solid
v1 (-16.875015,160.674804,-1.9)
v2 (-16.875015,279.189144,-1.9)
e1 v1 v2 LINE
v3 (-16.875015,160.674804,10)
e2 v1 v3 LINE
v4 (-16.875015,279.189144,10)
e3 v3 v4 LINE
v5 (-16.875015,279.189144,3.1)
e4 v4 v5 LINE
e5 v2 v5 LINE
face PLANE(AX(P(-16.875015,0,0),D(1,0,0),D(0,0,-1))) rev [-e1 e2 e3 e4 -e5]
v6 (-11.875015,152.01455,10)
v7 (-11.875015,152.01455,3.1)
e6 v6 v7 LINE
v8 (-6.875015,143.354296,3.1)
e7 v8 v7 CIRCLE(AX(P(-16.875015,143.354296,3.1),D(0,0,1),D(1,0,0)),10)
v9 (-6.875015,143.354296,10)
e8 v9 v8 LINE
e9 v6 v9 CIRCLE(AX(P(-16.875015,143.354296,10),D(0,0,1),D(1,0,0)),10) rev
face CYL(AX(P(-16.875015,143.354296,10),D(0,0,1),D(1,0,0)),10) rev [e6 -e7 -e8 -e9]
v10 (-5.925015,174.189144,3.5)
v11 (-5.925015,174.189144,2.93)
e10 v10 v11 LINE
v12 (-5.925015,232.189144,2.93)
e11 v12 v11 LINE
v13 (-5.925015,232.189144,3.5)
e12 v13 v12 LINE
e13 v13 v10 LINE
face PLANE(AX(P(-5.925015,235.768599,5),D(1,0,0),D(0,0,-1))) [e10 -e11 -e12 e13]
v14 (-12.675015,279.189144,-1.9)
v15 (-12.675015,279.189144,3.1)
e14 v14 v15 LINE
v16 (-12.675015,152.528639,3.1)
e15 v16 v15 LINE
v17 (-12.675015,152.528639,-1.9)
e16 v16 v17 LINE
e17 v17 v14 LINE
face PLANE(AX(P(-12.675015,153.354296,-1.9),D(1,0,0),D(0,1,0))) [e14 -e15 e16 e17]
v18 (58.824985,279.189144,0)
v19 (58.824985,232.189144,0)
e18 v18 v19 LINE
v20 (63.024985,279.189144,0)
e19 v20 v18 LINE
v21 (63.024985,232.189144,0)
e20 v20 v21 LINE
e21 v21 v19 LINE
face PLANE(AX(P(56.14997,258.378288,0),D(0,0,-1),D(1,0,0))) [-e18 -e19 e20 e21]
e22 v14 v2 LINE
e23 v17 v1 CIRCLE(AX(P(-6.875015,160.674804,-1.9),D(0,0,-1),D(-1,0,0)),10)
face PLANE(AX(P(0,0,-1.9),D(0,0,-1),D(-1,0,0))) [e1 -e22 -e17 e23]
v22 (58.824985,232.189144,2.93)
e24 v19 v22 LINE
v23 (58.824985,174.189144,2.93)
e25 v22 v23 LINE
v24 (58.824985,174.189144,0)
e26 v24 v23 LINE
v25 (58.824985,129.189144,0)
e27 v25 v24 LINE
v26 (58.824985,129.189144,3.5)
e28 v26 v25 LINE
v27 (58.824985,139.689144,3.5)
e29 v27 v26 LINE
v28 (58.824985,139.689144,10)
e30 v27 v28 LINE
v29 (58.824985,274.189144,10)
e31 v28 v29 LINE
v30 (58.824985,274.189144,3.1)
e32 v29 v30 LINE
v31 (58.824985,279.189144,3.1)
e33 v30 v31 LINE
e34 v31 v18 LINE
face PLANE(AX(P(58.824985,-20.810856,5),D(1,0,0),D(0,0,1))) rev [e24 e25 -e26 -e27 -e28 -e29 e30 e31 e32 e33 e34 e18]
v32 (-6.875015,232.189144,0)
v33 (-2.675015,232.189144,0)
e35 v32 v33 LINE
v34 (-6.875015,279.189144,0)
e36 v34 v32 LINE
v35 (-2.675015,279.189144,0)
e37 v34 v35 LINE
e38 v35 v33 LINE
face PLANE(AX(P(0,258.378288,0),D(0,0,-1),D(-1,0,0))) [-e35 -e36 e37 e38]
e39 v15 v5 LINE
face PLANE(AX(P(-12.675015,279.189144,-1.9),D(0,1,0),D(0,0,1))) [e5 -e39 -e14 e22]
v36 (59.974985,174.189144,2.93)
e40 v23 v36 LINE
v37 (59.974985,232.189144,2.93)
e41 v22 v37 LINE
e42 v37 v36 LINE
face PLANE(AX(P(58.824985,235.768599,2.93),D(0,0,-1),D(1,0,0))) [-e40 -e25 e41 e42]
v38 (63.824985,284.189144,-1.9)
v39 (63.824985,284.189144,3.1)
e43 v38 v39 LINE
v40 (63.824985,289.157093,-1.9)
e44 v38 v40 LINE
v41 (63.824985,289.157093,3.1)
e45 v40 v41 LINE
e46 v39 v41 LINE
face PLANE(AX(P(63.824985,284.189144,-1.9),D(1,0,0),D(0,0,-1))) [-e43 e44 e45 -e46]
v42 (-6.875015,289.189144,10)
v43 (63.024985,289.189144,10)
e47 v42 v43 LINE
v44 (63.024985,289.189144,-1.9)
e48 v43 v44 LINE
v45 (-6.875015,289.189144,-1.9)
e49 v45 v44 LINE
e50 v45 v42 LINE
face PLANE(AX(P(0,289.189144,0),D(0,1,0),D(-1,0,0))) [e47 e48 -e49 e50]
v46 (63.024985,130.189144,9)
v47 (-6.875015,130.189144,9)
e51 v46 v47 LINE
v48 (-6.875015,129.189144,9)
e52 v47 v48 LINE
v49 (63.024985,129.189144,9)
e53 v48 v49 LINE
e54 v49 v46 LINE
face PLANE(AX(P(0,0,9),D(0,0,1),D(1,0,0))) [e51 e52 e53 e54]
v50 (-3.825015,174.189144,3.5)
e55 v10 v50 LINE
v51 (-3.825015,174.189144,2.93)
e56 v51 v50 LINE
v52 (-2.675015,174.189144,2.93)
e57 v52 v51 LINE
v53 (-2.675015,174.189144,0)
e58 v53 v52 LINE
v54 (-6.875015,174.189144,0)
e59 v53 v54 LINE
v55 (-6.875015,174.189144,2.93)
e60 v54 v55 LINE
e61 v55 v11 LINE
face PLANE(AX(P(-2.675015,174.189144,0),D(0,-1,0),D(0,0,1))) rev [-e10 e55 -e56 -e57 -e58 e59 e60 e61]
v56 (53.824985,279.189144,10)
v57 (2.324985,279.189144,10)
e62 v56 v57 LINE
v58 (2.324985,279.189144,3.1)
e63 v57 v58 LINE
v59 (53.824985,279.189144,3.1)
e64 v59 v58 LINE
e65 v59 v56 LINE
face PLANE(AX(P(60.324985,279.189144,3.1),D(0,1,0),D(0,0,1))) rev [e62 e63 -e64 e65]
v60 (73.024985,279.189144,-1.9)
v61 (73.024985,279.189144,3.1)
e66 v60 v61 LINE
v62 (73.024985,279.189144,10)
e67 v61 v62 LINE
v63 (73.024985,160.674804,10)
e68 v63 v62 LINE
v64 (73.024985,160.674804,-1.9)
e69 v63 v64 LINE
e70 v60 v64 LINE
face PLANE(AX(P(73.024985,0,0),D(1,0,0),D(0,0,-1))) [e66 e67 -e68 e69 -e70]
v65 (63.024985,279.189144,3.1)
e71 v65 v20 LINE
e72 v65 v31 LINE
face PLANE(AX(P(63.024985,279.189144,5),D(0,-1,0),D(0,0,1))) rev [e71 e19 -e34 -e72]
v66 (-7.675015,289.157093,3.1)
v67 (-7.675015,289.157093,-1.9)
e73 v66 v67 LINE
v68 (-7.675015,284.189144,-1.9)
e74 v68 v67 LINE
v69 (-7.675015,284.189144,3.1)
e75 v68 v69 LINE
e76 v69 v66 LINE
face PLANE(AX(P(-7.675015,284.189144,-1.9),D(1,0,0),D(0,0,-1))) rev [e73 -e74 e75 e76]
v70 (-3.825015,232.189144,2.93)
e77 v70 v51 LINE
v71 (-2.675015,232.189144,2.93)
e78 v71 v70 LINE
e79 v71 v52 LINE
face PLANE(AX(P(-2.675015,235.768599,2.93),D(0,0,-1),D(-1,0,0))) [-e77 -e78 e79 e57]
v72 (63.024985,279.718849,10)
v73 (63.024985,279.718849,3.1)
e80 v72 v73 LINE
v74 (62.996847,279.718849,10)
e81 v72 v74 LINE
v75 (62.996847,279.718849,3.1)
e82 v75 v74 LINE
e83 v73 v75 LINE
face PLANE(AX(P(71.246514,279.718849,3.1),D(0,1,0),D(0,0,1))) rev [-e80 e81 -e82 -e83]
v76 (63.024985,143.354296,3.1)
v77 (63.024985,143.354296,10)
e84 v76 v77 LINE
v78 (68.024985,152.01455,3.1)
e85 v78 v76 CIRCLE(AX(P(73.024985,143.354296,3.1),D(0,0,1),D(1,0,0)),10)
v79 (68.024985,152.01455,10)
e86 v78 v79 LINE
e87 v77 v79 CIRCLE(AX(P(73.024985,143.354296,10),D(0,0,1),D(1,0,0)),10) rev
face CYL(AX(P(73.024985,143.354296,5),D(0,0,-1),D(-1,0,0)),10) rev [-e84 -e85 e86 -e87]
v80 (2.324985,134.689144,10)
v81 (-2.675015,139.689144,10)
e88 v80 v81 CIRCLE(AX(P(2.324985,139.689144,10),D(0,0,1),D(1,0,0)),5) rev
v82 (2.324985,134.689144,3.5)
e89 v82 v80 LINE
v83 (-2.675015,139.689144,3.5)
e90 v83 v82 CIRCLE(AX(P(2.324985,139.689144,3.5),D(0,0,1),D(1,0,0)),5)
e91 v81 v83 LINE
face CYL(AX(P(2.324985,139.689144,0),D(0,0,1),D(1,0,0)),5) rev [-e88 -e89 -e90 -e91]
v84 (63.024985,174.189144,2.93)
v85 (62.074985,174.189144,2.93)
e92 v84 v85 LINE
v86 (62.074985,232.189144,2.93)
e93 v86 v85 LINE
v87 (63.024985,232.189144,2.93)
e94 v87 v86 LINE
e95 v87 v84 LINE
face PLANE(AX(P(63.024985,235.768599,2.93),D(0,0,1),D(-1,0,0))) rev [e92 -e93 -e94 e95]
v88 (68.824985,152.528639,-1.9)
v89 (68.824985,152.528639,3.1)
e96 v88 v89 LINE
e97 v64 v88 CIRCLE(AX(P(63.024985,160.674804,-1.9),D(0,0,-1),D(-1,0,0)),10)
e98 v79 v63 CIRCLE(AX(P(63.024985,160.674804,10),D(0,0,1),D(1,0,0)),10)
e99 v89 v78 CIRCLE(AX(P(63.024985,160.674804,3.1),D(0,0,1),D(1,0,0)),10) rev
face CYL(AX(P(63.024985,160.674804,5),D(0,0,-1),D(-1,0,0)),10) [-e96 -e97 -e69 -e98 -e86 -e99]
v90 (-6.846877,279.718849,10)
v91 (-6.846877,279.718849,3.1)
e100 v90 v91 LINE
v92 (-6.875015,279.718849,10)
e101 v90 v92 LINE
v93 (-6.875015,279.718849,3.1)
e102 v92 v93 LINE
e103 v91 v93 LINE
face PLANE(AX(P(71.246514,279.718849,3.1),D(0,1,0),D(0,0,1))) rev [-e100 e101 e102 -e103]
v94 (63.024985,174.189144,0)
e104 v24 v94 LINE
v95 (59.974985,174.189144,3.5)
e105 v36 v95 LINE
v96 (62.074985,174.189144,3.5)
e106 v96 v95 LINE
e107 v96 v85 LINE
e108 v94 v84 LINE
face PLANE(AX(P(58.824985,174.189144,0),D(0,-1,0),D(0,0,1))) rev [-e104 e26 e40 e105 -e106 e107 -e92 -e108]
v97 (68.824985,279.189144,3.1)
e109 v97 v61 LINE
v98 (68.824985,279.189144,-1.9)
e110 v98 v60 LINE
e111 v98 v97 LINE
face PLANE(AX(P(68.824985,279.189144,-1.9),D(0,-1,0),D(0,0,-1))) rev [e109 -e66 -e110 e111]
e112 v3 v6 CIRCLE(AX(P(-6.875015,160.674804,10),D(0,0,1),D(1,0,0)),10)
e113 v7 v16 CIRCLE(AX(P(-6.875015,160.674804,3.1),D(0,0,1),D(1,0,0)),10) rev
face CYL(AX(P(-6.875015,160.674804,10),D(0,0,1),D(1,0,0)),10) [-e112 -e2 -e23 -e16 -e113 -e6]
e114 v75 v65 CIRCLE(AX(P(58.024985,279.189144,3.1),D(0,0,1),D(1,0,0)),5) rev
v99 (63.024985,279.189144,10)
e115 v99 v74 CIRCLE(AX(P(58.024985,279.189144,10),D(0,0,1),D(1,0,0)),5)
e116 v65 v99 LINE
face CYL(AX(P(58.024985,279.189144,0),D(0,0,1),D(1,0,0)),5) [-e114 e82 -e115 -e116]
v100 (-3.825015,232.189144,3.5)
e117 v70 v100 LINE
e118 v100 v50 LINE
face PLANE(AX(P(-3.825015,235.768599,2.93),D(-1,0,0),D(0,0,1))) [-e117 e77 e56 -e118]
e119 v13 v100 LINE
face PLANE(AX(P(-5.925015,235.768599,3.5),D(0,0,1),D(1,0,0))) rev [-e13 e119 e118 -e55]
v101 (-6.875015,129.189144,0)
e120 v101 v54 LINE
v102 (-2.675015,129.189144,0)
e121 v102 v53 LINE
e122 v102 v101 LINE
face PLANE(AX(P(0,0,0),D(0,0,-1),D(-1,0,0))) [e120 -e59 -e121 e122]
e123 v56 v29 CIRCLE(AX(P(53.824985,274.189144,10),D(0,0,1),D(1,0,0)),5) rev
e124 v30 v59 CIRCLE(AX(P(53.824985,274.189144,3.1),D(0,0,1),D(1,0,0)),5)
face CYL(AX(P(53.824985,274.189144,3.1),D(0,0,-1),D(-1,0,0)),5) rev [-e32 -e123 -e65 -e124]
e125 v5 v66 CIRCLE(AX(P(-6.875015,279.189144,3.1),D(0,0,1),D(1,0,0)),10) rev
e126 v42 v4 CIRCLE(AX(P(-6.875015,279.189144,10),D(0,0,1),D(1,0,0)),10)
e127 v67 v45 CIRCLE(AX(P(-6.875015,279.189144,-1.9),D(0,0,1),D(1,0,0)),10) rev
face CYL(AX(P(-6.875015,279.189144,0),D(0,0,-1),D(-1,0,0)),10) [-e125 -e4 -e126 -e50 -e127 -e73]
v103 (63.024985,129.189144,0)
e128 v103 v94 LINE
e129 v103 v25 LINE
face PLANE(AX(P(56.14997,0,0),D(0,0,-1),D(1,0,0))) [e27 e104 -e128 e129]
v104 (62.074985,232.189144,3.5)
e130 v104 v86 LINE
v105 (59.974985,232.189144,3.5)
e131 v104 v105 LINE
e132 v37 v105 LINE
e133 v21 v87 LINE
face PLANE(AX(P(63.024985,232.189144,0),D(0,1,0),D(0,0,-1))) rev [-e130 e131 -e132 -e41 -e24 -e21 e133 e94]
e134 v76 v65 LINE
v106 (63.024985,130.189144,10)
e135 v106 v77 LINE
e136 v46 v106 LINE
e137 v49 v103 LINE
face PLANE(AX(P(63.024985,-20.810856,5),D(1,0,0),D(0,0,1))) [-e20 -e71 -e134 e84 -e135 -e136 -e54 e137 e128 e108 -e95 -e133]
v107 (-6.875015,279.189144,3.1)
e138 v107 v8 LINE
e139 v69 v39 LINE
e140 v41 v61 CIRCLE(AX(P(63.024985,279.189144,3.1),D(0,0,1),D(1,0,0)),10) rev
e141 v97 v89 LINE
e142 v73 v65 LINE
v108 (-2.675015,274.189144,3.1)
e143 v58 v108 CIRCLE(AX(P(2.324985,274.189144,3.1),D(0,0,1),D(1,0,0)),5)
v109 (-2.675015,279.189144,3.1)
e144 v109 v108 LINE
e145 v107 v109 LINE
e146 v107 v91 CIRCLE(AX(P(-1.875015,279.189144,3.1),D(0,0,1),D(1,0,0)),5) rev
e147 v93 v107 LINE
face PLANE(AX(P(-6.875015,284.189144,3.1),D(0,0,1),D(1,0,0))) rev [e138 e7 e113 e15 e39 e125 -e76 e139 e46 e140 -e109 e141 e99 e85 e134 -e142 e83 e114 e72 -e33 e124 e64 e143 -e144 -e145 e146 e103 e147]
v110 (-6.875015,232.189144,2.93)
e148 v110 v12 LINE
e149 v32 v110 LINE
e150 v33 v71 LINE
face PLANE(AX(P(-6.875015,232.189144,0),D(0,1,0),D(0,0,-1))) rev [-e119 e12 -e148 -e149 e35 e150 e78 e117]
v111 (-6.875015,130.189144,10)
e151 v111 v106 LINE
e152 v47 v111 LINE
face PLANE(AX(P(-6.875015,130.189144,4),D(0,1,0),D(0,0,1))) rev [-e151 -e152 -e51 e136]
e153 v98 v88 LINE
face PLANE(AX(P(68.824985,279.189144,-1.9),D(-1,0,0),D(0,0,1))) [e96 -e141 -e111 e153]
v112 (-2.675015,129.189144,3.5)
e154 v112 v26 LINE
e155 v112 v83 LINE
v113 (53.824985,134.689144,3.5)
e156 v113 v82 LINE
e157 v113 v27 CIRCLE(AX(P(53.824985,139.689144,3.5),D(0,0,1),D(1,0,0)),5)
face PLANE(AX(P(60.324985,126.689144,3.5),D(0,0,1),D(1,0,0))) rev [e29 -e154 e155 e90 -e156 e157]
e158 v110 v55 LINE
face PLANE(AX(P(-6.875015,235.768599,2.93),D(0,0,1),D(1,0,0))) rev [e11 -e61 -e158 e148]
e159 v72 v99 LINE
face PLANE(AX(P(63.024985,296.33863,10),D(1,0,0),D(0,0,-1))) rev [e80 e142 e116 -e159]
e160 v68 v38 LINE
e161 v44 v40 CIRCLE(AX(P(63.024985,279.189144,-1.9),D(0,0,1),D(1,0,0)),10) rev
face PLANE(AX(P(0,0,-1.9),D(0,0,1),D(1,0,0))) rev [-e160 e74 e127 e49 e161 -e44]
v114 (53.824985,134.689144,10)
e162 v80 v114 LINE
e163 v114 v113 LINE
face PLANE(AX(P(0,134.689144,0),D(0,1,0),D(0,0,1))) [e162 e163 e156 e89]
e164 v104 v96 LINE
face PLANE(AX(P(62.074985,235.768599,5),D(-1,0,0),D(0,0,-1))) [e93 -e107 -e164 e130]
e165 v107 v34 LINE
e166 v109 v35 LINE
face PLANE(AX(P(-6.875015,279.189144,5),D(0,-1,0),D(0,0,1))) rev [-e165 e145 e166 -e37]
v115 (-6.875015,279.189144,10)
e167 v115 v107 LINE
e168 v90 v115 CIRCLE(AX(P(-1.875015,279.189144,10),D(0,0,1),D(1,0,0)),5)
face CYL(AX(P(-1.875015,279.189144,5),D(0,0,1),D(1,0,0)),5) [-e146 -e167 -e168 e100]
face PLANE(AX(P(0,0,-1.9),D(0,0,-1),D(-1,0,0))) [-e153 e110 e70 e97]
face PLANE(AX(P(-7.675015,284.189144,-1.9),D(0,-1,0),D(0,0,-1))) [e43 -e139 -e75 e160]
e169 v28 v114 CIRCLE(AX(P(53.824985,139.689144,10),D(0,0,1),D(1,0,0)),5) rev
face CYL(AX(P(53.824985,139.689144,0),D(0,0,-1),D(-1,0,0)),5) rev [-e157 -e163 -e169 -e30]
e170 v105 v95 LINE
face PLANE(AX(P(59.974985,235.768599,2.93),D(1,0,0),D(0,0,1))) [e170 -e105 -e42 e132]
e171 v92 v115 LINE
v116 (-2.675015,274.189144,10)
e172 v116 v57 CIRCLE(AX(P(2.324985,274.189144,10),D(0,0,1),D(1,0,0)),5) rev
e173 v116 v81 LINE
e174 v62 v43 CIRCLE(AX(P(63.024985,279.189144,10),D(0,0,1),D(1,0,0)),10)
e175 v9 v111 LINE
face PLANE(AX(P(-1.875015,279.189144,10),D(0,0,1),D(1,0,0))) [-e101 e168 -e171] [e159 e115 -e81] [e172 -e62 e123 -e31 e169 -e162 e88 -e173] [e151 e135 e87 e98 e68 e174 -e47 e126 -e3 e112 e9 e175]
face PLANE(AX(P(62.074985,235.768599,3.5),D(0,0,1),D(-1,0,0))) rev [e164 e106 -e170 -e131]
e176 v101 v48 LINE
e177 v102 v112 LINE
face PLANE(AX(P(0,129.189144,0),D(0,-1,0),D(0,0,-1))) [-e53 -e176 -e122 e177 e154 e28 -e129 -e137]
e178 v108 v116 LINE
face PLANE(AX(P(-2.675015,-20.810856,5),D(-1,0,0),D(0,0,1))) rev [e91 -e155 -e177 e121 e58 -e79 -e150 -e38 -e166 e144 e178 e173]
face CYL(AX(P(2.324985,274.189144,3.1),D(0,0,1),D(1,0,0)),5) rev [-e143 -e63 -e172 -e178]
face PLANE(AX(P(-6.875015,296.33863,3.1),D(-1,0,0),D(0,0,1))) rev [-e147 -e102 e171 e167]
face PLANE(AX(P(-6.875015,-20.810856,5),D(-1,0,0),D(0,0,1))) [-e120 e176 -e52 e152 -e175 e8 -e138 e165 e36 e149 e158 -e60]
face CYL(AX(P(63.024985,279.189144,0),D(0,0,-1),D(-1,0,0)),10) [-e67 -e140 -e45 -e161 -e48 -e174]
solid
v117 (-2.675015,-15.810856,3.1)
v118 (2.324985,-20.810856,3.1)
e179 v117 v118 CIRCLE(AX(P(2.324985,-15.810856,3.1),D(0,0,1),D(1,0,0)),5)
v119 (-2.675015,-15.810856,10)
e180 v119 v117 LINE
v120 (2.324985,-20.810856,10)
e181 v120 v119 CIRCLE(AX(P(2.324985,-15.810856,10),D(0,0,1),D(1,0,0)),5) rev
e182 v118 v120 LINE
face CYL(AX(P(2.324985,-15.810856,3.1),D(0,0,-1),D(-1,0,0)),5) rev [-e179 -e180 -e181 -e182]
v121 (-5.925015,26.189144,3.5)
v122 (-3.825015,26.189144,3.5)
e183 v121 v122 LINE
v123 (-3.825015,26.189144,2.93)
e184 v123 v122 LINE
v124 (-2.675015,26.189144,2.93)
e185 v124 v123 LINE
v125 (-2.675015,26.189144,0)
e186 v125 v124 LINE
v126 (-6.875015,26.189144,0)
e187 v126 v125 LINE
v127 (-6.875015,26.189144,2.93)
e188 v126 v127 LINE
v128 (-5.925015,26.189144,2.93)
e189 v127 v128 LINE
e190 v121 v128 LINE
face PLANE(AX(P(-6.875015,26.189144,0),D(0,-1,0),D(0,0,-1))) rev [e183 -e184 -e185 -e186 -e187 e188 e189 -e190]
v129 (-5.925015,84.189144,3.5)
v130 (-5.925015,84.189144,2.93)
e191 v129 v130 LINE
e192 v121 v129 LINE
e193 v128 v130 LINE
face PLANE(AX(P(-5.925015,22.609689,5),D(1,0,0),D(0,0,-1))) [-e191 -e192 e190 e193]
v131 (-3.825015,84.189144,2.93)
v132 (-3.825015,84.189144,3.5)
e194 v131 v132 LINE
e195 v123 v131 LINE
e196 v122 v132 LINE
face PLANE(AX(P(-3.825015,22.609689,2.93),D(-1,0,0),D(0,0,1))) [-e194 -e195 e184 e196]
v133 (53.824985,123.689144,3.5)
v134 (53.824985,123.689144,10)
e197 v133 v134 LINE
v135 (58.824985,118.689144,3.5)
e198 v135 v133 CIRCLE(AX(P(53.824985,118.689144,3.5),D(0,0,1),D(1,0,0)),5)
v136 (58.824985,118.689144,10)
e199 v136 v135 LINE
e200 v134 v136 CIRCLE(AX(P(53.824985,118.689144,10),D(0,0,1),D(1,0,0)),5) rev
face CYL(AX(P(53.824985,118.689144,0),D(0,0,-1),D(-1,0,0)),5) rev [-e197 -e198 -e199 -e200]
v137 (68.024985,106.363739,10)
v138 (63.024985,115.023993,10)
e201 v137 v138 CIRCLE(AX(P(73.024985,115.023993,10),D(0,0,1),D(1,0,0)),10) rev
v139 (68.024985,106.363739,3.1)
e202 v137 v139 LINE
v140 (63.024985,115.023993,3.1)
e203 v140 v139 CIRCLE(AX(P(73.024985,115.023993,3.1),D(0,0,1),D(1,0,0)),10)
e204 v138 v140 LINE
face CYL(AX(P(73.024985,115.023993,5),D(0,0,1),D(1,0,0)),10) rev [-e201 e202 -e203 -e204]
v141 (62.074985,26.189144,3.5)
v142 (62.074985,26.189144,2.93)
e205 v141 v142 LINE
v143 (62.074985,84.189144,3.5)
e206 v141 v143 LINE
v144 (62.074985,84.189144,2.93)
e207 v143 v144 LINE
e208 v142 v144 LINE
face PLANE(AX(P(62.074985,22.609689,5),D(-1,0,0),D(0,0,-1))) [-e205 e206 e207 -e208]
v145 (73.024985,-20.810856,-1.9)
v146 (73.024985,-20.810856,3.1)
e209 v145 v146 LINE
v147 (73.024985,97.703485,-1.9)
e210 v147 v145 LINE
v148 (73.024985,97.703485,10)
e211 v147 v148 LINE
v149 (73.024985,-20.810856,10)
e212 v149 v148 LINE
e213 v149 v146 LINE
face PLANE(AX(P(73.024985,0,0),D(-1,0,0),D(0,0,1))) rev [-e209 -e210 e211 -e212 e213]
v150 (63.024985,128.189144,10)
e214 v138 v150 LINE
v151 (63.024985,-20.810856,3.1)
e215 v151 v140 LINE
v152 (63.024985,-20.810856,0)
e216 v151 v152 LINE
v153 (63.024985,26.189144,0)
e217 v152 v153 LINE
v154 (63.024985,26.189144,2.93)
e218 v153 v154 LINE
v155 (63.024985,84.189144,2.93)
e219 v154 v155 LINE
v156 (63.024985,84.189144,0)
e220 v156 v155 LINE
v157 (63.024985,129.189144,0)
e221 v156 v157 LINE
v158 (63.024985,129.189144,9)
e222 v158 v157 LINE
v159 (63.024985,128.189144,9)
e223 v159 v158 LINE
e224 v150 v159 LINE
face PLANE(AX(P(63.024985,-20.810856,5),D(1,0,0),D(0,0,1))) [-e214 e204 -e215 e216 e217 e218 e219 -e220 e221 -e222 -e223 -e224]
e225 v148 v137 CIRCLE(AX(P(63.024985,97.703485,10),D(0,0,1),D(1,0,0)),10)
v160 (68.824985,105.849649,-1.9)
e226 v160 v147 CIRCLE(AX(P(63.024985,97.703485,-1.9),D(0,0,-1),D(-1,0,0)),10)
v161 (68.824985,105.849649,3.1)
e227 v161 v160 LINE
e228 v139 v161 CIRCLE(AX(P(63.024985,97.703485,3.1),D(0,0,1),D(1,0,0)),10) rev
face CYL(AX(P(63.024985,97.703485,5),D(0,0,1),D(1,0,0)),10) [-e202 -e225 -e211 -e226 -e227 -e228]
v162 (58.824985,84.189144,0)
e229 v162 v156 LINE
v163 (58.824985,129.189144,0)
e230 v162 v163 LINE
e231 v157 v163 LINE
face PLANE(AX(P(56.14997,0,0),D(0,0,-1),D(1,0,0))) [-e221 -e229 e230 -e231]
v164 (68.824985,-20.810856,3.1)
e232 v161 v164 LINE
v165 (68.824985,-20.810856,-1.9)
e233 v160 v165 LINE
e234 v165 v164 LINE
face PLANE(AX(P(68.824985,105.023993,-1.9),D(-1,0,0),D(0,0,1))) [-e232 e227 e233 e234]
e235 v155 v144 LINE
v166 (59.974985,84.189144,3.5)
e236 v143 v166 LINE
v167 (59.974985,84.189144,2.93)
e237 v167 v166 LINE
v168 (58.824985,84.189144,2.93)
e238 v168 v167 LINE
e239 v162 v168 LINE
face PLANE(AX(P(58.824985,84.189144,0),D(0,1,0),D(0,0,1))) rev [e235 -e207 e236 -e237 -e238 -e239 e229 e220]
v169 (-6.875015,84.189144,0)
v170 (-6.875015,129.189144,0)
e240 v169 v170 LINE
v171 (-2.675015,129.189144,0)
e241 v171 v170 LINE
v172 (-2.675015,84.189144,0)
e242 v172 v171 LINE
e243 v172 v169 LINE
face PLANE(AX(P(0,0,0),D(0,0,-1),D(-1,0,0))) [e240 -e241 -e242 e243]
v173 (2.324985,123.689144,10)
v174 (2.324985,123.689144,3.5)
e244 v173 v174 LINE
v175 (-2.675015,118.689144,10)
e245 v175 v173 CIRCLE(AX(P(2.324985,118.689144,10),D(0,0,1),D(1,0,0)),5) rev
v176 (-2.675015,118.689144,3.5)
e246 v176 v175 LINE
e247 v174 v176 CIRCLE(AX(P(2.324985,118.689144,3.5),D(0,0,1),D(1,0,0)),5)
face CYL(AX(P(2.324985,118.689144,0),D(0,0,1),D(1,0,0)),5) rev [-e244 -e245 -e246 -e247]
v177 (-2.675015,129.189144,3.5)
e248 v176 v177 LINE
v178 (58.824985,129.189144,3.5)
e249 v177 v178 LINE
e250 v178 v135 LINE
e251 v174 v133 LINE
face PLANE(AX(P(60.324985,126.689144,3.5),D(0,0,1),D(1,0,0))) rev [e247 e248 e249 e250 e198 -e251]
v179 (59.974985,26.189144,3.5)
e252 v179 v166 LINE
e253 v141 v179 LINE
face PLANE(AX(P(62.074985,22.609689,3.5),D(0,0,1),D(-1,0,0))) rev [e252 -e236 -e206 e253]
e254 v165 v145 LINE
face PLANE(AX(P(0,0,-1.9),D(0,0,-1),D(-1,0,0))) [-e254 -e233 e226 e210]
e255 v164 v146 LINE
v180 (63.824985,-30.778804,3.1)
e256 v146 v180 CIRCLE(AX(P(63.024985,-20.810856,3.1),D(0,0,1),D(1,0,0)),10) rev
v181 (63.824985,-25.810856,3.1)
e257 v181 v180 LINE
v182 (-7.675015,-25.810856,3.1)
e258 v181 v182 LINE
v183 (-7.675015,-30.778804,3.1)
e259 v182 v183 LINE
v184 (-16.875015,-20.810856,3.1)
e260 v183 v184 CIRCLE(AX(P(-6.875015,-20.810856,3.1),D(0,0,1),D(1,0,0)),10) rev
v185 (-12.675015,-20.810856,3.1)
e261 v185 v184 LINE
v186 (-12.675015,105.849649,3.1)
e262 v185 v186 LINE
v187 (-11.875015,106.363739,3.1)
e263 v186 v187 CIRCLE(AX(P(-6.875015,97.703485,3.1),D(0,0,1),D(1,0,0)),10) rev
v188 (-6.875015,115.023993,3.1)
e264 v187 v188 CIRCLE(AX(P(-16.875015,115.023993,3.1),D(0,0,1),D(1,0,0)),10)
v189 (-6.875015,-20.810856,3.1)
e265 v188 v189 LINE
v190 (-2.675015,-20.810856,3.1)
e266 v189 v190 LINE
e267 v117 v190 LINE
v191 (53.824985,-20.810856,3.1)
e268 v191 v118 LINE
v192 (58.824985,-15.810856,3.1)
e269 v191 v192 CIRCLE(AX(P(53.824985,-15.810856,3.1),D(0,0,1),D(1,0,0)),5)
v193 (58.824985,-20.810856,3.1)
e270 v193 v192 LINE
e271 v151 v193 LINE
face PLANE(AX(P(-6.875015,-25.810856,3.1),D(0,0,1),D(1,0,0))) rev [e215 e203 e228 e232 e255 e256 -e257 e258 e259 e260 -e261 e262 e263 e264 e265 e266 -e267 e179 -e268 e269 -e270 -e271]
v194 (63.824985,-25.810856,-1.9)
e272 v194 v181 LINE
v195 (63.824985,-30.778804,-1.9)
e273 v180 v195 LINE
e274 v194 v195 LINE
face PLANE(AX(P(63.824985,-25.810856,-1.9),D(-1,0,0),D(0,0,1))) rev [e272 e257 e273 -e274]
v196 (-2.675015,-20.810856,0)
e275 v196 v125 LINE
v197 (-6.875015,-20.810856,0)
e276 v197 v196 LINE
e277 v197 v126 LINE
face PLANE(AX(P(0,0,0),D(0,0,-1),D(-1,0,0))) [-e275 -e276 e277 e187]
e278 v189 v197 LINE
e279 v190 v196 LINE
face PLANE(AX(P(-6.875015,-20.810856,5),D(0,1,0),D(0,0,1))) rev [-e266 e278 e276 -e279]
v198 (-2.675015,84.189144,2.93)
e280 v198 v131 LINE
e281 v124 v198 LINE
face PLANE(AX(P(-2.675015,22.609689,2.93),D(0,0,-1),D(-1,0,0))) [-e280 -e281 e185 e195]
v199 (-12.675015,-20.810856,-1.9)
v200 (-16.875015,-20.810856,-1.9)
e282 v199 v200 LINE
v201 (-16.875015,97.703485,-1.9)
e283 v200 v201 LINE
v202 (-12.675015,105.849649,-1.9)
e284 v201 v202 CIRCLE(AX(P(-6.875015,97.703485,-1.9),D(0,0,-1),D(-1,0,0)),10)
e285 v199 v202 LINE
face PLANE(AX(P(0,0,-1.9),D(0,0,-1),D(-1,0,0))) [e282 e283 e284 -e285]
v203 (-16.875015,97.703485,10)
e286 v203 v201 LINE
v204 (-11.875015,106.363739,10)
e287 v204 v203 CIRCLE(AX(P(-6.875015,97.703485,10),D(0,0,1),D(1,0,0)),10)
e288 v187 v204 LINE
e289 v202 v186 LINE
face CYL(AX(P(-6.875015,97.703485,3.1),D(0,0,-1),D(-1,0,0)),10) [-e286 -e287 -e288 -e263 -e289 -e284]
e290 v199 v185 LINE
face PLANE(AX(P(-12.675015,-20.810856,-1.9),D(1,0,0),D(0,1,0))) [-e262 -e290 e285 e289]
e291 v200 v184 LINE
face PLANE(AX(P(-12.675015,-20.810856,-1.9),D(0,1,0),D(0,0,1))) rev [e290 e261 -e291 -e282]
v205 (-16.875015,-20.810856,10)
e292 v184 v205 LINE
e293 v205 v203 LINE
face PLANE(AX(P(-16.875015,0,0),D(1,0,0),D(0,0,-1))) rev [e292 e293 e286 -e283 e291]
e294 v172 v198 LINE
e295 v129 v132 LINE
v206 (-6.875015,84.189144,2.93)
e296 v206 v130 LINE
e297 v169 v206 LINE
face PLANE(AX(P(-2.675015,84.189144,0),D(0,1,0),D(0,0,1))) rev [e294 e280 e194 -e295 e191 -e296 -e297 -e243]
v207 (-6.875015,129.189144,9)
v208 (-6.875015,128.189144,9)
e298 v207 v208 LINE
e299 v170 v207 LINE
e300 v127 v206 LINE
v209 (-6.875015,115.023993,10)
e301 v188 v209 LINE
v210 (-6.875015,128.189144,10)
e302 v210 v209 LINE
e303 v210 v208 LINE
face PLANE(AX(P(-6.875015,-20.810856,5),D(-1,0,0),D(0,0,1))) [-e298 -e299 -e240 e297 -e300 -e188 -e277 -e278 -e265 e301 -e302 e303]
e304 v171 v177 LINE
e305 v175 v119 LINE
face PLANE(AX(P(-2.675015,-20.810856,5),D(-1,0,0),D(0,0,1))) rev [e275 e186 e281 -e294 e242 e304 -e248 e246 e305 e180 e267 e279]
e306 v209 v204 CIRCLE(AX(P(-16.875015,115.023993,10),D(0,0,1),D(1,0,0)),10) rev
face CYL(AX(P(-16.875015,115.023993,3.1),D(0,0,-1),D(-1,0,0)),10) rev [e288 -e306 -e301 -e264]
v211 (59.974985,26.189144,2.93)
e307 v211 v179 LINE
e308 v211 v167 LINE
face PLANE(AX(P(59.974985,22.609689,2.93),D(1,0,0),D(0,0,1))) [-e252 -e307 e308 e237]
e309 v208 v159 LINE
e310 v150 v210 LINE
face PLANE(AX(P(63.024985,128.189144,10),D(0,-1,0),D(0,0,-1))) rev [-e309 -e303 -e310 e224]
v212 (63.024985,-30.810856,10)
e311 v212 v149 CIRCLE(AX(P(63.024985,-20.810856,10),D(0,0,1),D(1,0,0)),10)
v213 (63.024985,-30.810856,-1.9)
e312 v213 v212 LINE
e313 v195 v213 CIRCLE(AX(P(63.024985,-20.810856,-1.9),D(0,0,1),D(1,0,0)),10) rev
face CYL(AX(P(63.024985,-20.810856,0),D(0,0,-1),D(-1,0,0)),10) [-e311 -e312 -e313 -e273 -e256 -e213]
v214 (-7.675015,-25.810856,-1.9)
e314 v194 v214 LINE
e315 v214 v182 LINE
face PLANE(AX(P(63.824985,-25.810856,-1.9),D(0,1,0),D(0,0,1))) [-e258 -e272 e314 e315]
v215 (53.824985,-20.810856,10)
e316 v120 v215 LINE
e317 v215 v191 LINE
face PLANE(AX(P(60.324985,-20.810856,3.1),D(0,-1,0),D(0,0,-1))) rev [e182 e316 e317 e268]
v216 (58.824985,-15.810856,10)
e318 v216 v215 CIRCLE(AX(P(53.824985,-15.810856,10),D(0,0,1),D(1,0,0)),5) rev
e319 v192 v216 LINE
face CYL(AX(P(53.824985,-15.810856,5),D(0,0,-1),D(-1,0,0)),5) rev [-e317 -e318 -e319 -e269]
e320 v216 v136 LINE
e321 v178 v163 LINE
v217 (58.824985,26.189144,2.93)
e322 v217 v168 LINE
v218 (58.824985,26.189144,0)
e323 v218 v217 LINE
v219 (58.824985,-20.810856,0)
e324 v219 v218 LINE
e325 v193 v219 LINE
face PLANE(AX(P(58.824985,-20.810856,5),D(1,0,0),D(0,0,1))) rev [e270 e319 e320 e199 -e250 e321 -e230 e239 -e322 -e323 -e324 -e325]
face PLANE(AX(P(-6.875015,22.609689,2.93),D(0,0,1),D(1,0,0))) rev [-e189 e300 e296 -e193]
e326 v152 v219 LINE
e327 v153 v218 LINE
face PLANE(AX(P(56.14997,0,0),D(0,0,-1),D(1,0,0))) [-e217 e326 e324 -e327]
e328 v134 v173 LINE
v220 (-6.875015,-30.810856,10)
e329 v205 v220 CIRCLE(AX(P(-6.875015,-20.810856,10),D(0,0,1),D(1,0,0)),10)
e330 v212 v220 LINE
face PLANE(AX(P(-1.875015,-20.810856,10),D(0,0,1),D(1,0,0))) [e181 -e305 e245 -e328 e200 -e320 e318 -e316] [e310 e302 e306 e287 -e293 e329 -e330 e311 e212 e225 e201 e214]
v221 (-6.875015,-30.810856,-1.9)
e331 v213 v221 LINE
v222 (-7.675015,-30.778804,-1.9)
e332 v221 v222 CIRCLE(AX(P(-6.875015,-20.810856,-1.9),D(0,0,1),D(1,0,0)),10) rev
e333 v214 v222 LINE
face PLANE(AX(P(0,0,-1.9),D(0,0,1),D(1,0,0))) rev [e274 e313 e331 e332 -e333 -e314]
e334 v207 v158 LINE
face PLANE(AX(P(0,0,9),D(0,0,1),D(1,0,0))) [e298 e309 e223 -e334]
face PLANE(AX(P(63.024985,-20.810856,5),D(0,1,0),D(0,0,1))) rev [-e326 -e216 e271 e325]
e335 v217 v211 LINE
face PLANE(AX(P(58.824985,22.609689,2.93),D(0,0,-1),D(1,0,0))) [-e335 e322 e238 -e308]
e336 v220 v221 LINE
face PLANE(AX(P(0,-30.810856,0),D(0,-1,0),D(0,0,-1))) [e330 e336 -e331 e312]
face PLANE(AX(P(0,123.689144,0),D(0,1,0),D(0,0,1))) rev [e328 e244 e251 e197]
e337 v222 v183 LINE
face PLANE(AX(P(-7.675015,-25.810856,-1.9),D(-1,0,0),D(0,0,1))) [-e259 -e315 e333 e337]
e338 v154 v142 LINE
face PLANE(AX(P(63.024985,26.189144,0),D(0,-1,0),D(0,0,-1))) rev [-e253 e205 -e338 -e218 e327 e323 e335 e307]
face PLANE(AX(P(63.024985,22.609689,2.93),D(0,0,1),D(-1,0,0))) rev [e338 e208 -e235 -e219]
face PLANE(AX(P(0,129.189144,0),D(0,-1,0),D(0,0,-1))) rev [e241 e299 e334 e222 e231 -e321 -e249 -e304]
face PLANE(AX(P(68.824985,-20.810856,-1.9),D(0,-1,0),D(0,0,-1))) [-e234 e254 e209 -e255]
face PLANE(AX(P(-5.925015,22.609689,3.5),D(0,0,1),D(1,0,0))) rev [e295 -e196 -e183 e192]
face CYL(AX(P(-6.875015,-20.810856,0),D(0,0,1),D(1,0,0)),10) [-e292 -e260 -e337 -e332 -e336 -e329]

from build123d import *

# Parameters (mm, degrees)
SKETCH1_W            = 300
SKETCH1_H            = 4.2
BOSS_EXTRUDE1_DEPTH  = 5
SKETCH3_W            = 4.2
SKETCH3_H            = 58
CUT_EXTRUDE1_DEPTH   = 280.318535117
SKETCH4_W            = 2.1
SKETCH4_H            = 1.5
SKETCH4_W_2          = 1.15
SKETCH4_H_2          = 0.57
BOSS_EXTRUDE2_DEPTH  = 58
SKETCH5_W            = 4.2
SKETCH5_H            = 1.9
BOSS_EXTRUDE3_DEPTH  = 5
SKETCH6_W            = 5
SKETCH6_H            = 1.9
BOSS_EXTRUDE4_DEPTH  = 63
SKETCH7_W            = 5
SKETCH7_H            = 1.9
BOSS_EXTRUDE5_DEPTH  = 63
SKETCH8_W            = 5
SKETCH8_H            = 1.5
BOSS_EXTRUDE6_DEPTH  = 63
FILLET1_R            = 5
SKETCH9_W            = 69.9
SKETCH9_H            = 2
CUT_EXTRUDE2_DEPTH   = 1
SKETCH11_W           = 61.5
SKETCH11_H           = 147.5
BOSS_EXTRUDE8_DEPTH  = 5
SKETCH12_W           = 69.9
SKETCH12_H           = 2
BOSS_EXTRUDE9_DEPTH  = 5
SKETCH13_W           = 61.5
SKETCH13_H           = 147.5
BOSS_EXTRUDE10_DEPTH = 5
SKETCH15_W           = 125.83484861
SKETCH15_H           = 6.9
BOSS_EXTRUDE11_DEPTH = 10
SKETCH16_W           = 125.83484861
SKETCH16_H           = 6.9
BOSS_EXTRUDE12_DEPTH = 10
SKETCH17_W           = 10
SKETCH17_H           = 6.9
BOSS_EXTRUDE13_DEPTH = 5
BOSS_EXTRUDE14_REACH = 297.377
SKETCH18_W           = 4.47029548
SKETCH18_H           = 6.9
SKETCH19_W           = 10
SKETCH19_H           = 6.9
BOSS_EXTRUDE15_DEPTH = 5
SKETCH20_W           = 5
SKETCH20_H           = 6.9
BOSS_EXTRUDE16_DEPTH = 79.9
SKETCH21_W           = 89.9
SKETCH21_H           = 6.9
BOSS_EXTRUDE17_DEPTH = 5
SKETCH22_W           = 89.9
SKETCH22_H           = 6.9
BOSS_EXTRUDE18_DEPTH = 5
SKETCH23_W           = 4.2
SKETCH23_H           = 125.83484861
SKETCH23_W_2         = 71.5
SKETCH23_H_2         = 5
BOSS_EXTRUDE19_DEPTH = 5
SKETCH24_W           = 4.2
SKETCH24_H           = 125.83484861
SKETCH24_W_2         = 71.5
SKETCH24_H_2         = 5
BOSS_EXTRUDE20_DEPTH = 5
FILLET2_R            = 10
FILLET3_R            = 10
FILLET4_R            = 10
SKETCH25_W           = 61.5
SKETCH25_H           = 6.5
BOSS_EXTRUDE21_DEPTH = 3
SKETCH26_W           = 61.5
SKETCH26_H           = 6.5
BOSS_EXTRUDE22_DEPTH = 3
FILLET5_R            = 5


with BuildPart() as part:
    # Sketch1 → Boss-Extrude1 (new body)
    with BuildSketch(Plane(origin=(0, 0, 0), x_dir=(0, 1, 0), z_dir=(0, 0, 1))):
        with Locations((129.189144184, 4.775014868)):
            Rectangle(SKETCH1_W, SKETCH1_H)
    extrude(amount=BOSS_EXTRUDE1_DEPTH)

    # Sketch3 → Cut-Extrude1 (cut, through all)
    with BuildSketch(Plane.XY.offset(5)):
        with Locations((-4.775014868, 55.189144184)):
            Rectangle(SKETCH3_W, SKETCH3_H)
    extrude(amount=-CUT_EXTRUDE1_DEPTH, mode=Mode.SUBTRACT)


with BuildPart() as cut_extrude1_piece_1:
    # of the separate pieces the step leaves, piece 1, a body of its own (cut_extrude1_pieces)
    add(part.part.solids().sort_by_distance((-6.875014868, 84.189144184, 0))[0])



with BuildPart() as cut_extrude1_piece_2:
    # of the separate pieces the step leaves, piece 2, a body of its own (cut_extrude1_pieces)
    add(part.part.solids().sort_by_distance((-6.875014868, -20.810855816, 0))[0])


with BuildPart() as cut_extrude1_piece_1_1:
    add(cut_extrude1_piece_1.part)

    add(cut_extrude1_piece_2.part)  # Boss-Extrude2 merges Cut-Extrude1 piece 2
    # Sketch4 → Boss-Extrude2 (add)
    with BuildSketch(Plane.XZ.offset(-84.189144184)):
        Polygon((-5.925014868, 5), (-6.875014868, 5), (-6.875014868, 2.93), (-5.925014868, 2.93), (-5.925014868, 3.5), align=None)
        with Locations((-4.875014868, 4.25)):
            Rectangle(SKETCH4_W, SKETCH4_H)
        with Locations((-3.250014868, 4.25)):
            Rectangle(SKETCH4_W_2, SKETCH4_H)
        with Locations((-3.250014868, 3.215)):
            Rectangle(SKETCH4_W_2, SKETCH4_H_2)
    extrude(amount=BOSS_EXTRUDE2_DEPTH)

    # Split1
    split(bisect_by=Plane(origin=(0, 129.189144184, 0), x_dir=(1, 0, 0), z_dir=(0, 1, 0)), keep=Keep.BOTTOM)

    # Sketch5 → Boss-Extrude3 (add)
    with BuildSketch(Plane.XZ.offset(20.810855816)):
        with Locations((-4.775014868, 4.05)):
            Rectangle(SKETCH5_W, SKETCH5_H)
    extrude(amount=BOSS_EXTRUDE3_DEPTH)

    # Mirror1: Cut-Extrude1 piece 1 across plane


with BuildPart() as cut_extrude1_piece_1_2:
    add(cut_extrude1_piece_1_1.part)
    add(cut_extrude1_piece_1_1.part.mirror(Plane.ZX.offset(129.189144184)))


with BuildPart() as body_2:
    # Mirror4: mirrored copy
    add(cut_extrude1_piece_1_2.part.mirror(Plane.ZY.offset(-28.074985132)))


with BuildPart() as cut_extrude1_piece_1_3:
    add(cut_extrude1_piece_1_2.part)

    add(body_2.part)  # Boss-Extrude4 merges body 2
    # Sketch6 → Boss-Extrude4 (add)
    with BuildSketch(Plane.YZ.offset(-2.675014868)):
        with Locations((-23.310855816, 4.05)):
            Rectangle(SKETCH6_W, SKETCH6_H)
    extrude(amount=BOSS_EXTRUDE4_DEPTH)

    # Sketch7 → Boss-Extrude5 (add)
    with BuildSketch(Plane.YZ.offset(-2.675014868)):
        with Locations((281.689144184, 4.05)):
            Rectangle(SKETCH7_W, SKETCH7_H)
    extrude(amount=BOSS_EXTRUDE5_DEPTH)

    # Sketch8 → Boss-Extrude6 (add)
    with BuildSketch(Plane.YZ.offset(-2.675014868)):
        with Locations((129.189144184, 4.25)):
            Rectangle(SKETCH8_W, SKETCH8_H)
    extrude(amount=BOSS_EXTRUDE6_DEPTH)

    # Fillet1
    fillet1_edges = [cut_extrude1_piece_1_3.edges().sort_by_distance(p)[0] for p in [
        (63.024985132, 284.189144184, 4.05),
        (-6.875014868, -25.810855816, 4.05),
        (-6.875014868, 284.189144184, 4.05),
        (63.024985132, -25.810855816, 4.05),
    ]]
    fillet(fillet1_edges, radius=FILLET1_R)

    # Sketch9 → Cut-Extrude2 (cut)
    with BuildSketch(Plane.XY.offset(5)):
        with Locations((28.074985132, 129.189144184)):
            Rectangle(SKETCH9_W, SKETCH9_H)
    extrude(amount=-CUT_EXTRUDE2_DEPTH, mode=Mode.SUBTRACT)

    # Sketch11 → Boss-Extrude8 (add)
    with BuildSketch(Plane.XY.offset(5)):
        with BuildLine():
            Line((58.024985132, 284.189144184), (-1.875014868, 284.189144184))
            ThreePointArc((-1.875014868, 284.189144184), (-5.410548774, 282.72467809), (-6.875014868, 279.189144184))
            Line((-6.875014868, 279.189144184), (-6.875014868, 130.189144184))
            Line((-6.875014868, 130.189144184), (63.024985132, 130.189144184))
            Line((63.024985132, 130.189144184), (63.024985132, 279.189144184))
            ThreePointArc((63.024985132, 279.189144184), (61.560519038, 282.72467809), (58.024985132, 284.189144184))
        make_face()
        with Locations((28.074985132, 205.439144184)):
            Rectangle(SKETCH11_W, SKETCH11_H, mode=Mode.SUBTRACT)
    extrude(amount=BOSS_EXTRUDE8_DEPTH)

    # Sketch12 → Boss-Extrude9 (add)
    with BuildSketch(Plane.XY.offset(4)):
        with Locations((28.074985132, 129.189144184)):
            Rectangle(SKETCH12_W, SKETCH12_H)
    extrude(amount=BOSS_EXTRUDE9_DEPTH)

    # Sketch13 → Boss-Extrude10 (add)
    with BuildSketch(Plane.XY.offset(5)):
        with BuildLine():
            Line((63.024985132, -20.810855816), (63.024985132, 128.189144184))
            Line((63.024985132, 128.189144184), (-6.875014868, 128.189144184))
            Line((-6.875014868, 128.189144184), (-6.875014868, -20.810855816))
            ThreePointArc((-6.875014868, -20.810855816), (-5.410548774, -24.346389722), (-1.875014868, -25.810855816))
            Line((-1.875014868, -25.810855816), (58.024985132, -25.810855816))
            ThreePointArc((58.024985132, -25.810855816), (61.560519038, -24.346389722), (63.024985132, -20.810855816))
        make_face()
        with Locations((28.074985132, 52.939144184)):
            Rectangle(SKETCH13_W, SKETCH13_H, mode=Mode.SUBTRACT)
    extrude(amount=BOSS_EXTRUDE10_DEPTH)

    # Sketch15 → Boss-Extrude11 (add)
    with BuildSketch(Plane.YZ.offset(63.024985132)):
        with Locations((216.271719879, 6.55)):
            Rectangle(SKETCH15_W, SKETCH15_H)
        with Locations((42.106568489, 6.55)):
            Rectangle(SKETCH15_W, SKETCH15_H)
    extrude(amount=BOSS_EXTRUDE11_DEPTH)

    # Sketch16 → Boss-Extrude12 (add)
    with BuildSketch(Plane(origin=(-6.875014868, 0, 0), x_dir=(0, -1, 0), z_dir=(-1, 0, 0))):
        with Locations((-216.271719879, 6.55)):
            Rectangle(SKETCH16_W, SKETCH16_H)
        with Locations((-42.106568489, 6.55)):
            Rectangle(SKETCH16_W, SKETCH16_H)
    extrude(amount=BOSS_EXTRUDE12_DEPTH)

    # Sketch17 → Boss-Extrude13 (add)
    with BuildSketch(Plane(origin=(0, 279.189144184, 0), x_dir=(-1, 0, 0), z_dir=(0, 1, 0))):
        with Locations((11.875014868, 6.55)):
            Rectangle(SKETCH17_W, SKETCH17_H)
        with Locations((-68.024985132, 6.55)):
            Rectangle(SKETCH17_W, SKETCH17_H)
    extrude(amount=BOSS_EXTRUDE13_DEPTH)

    # Boss-Extrude14: up to this face of the body (flat: up to its plane)
    boss_extrude14_end = Plane(cut_extrude1_piece_1_3.part.faces().sort_by_distance((63.024985132, 281.689144184, 6.55))[0])
    # Sketch18 → Boss-Extrude14 (add, up to the picked face)
    with BuildSketch(Plane.YZ.offset(-6.875014868), mode=Mode.PRIVATE) as boss_extrude14_sk1:
        with Locations((281.953996444, 6.55)):
            Rectangle(SKETCH18_W, SKETCH18_H)
    boss_extrude14_tool1 = split(extrude(boss_extrude14_sk1.sketch, amount=BOSS_EXTRUDE14_REACH, mode=Mode.PRIVATE), bisect_by=boss_extrude14_end, keep=Keep.BOTH, mode=Mode.PRIVATE)
    add(boss_extrude14_tool1.solids().sort_by(Axis((-6.875015, 281.953996, 6.55), (1, 0, 0)))[0])

    # Sketch19 → Boss-Extrude15 (add)
    with BuildSketch(Plane.XZ.offset(20.810855816)):
        with Locations((68.024985132, 6.55)):
            Rectangle(SKETCH19_W, SKETCH19_H)
    extrude(amount=BOSS_EXTRUDE15_DEPTH)

    # Sketch20 → Boss-Extrude16 (add)
    with BuildSketch(Plane(origin=(63.024985132, 0, 0), x_dir=(0, -1, 0), z_dir=(-1, 0, 0))):
        with Locations((23.310855816, 6.55)):
            Rectangle(SKETCH20_W, SKETCH20_H)
    extrude(amount=BOSS_EXTRUDE16_DEPTH)

    # Sketch21 → Boss-Extrude17 (add)
    with BuildSketch(Plane.XZ.offset(25.810855816)):
        with Locations((28.074985132, 6.55)):
            Rectangle(SKETCH21_W, SKETCH21_H)
    extrude(amount=BOSS_EXTRUDE17_DEPTH)

    # Sketch22 → Boss-Extrude18 (add)
    with BuildSketch(Plane(origin=(0, 284.189144184, 0), x_dir=(-1, 0, 0), z_dir=(0, 1, 0))):
        with Locations((-28.074985132, 6.55)):
            Rectangle(SKETCH22_W, SKETCH22_H)
    extrude(amount=BOSS_EXTRUDE18_DEPTH)

    # Sketch23 → Boss-Extrude19 (add)
    with BuildSketch(Plane(origin=(0, 0, 3.1), x_dir=(1, 0, 0), z_dir=(0, 0, -1))):
        with Locations((-14.775014868, -216.271719879)):
            Rectangle(SKETCH23_W, SKETCH23_H)
        with Locations((28.074985132, -286.689144184)):
            Rectangle(SKETCH23_W_2, SKETCH23_H_2)
        with Locations((70.924985132, -216.271719879)):
            Rectangle(SKETCH23_W, SKETCH23_H)
    extrude(amount=BOSS_EXTRUDE19_DEPTH)

    # Sketch24 → Boss-Extrude20 (add)
    with BuildSketch(Plane(origin=(0, 0, 3.1), x_dir=(1, 0, 0), z_dir=(0, 0, -1))):
        with Locations((-14.775014868, -42.106568489)):
            Rectangle(SKETCH24_W, SKETCH24_H)
        with Locations((70.924985132, -42.106568489)):
            Rectangle(SKETCH24_W, SKETCH24_H)
        with Locations((28.074985132, 28.310855816)):
            Rectangle(SKETCH24_W_2, SKETCH24_H_2)
    extrude(amount=BOSS_EXTRUDE20_DEPTH)

    # Fillet2
    fillet2_edges = [cut_extrude1_piece_1_3.edges().sort_by_distance(p)[0] for p in [
        (-16.875014868, 289.189144184, 6.55),
        (73.024985132, 289.189144184, 6.55),
        (-16.875014868, -30.810855816, 6.55),
        (73.024985132, -30.810855816, 6.55),
    ]]
    fillet(fillet2_edges, radius=FILLET2_R)

    # Fillet3
    # the kernel refuses this fillet: 10 mm, written as the material it adds along each edge
    with BuildSketch(Plane(origin=(63.024985132, 105.023992794, 10), x_dir=(1, 0, 0), z_dir=(0, 0, -1))) as fillet3_piece_1_section:
        with BuildLine():
            CenterArc((FILLET3_R, -FILLET3_R), FILLET3_R, 90, 90)
            Line((0, -FILLET3_R), (0, 0))
            Line((0, 0), (FILLET3_R, 0))
        make_face()
    fillet3_piece_1 = extrude(amount=6.9, mode=Mode.PRIVATE)
    fillet3_piece_1 = split(fillet3_piece_1, bisect_by=Plane(origin=(68.824985132, 105.149733209, 6.55), z_dir=(1, 0, 0)), keep=Keep.TOP, mode=Mode.PRIVATE)
    add(fillet3_piece_1)
    with BuildSketch(Plane(origin=(63.024985132, 105.023992794, 10), x_dir=(1, 0, 0), z_dir=(0, 0, -1))) as fillet3_piece_2_section:
        with BuildLine():
            CenterArc((FILLET3_R, -FILLET3_R), FILLET3_R, 90, 90)
            Line((0, -FILLET3_R), (0, 0))
            Line((0, 0), (FILLET3_R, 0))
        make_face()
    fillet3_piece_2 = extrude(amount=6.9, mode=Mode.PRIVATE)
    fillet3_piece_2 = split(fillet3_piece_2, bisect_by=Plane(origin=(68.824985132, 107.480802197, 6.55), z_dir=(-1, 0, 0)), keep=Keep.TOP, mode=Mode.PRIVATE)
    add(fillet3_piece_2)
    with BuildSketch(Plane(origin=(63.024985132, 105.023992794, 10), x_dir=(1, 0, 0), z_dir=(0, 0, -1))) as fillet3_piece_3_section:
        with BuildLine():
            CenterArc((FILLET3_R, -FILLET3_R), FILLET3_R, 90, 90)
            Line((0, -FILLET3_R), (0, 0))
            Line((0, 0), (FILLET3_R, 0))
        make_face()
    fillet3_piece_3 = extrude(amount=31.9, mode=Mode.PRIVATE)
    fillet3_piece_3 = split(fillet3_piece_3, bisect_by=Plane(origin=(70.287056522, 105.149733209, 3.1), z_dir=(0, 0, -1)), keep=Keep.TOP, mode=Mode.PRIVATE)
    fillet3_piece_3 = split(fillet3_piece_3, bisect_by=Plane(origin=(68.824985132, 105.149733209, 1.55), z_dir=(1, 0, 0)), keep=Keep.TOP, mode=Mode.PRIVATE)
    fillet3_piece_3 = split(fillet3_piece_3, bisect_by=Plane(origin=(70.287056522, 105.149733209, 0), z_dir=(0, 0, 1)), keep=Keep.TOP, mode=Mode.PRIVATE)
    add(fillet3_piece_3)
    with BuildSketch(Plane(origin=(63.024985132, 105.023992794, 10), x_dir=(1, 0, 0), z_dir=(0, 0, -1))) as fillet3_piece_4_section:
        with BuildLine():
            CenterArc((FILLET3_R, -FILLET3_R), FILLET3_R, 90, 90)
            Line((0, -FILLET3_R), (0, 0))
            Line((0, 0), (FILLET3_R, 0))
        make_face()
    fillet3_piece_4 = extrude(amount=31.9, mode=Mode.PRIVATE)
    fillet3_piece_4 = split(fillet3_piece_4, bisect_by=Plane(origin=(68.824985132, 105.149733209, -0.95), z_dir=(1, 0, 0)), keep=Keep.TOP, mode=Mode.PRIVATE)
    fillet3_piece_4 = split(fillet3_piece_4, bisect_by=Plane(origin=(70.287056522, 105.149733209, -1.9), z_dir=(0, 0, 1)), keep=Keep.TOP, mode=Mode.PRIVATE)
    fillet3_piece_4 = split(fillet3_piece_4, bisect_by=Plane(origin=(70.287056522, 105.149733209, 0), z_dir=(0, 0, -1)), keep=Keep.TOP, mode=Mode.PRIVATE)
    add(fillet3_piece_4)
    with BuildSketch(Plane(origin=(63.024985132, 153.354295574, 10), x_dir=(0, -1, 0), z_dir=(0, 0, -1))) as fillet3_piece_5_section:
        with BuildLine():
            CenterArc((FILLET3_R, -FILLET3_R), FILLET3_R, 90, 90)
            Line((0, -FILLET3_R), (0, 0))
            Line((0, 0), (FILLET3_R, 0))
        make_face()
    fillet3_piece_5 = extrude(amount=6.9, mode=Mode.PRIVATE)
    fillet3_piece_5 = split(fillet3_piece_5, bisect_by=Plane(origin=(68.824985132, 150.897486171, 6.55), z_dir=(-1, 0, 0)), keep=Keep.TOP, mode=Mode.PRIVATE)
    add(fillet3_piece_5)
    with BuildSketch(Plane(origin=(63.024985132, 153.354295574, 10), x_dir=(0, -1, 0), z_dir=(0, 0, -1))) as fillet3_piece_6_section:
        with BuildLine():
            CenterArc((FILLET3_R, -FILLET3_R), FILLET3_R, 90, 90)
            Line((0, -FILLET3_R), (0, 0))
            Line((0, 0), (FILLET3_R, 0))
        make_face()
    fillet3_piece_6 = extrude(amount=6.9, mode=Mode.PRIVATE)
    fillet3_piece_6 = split(fillet3_piece_6, bisect_by=Plane(origin=(68.824985132, 153.22855516, 6.55), z_dir=(1, 0, 0)), keep=Keep.TOP, mode=Mode.PRIVATE)
    add(fillet3_piece_6)
    with BuildSketch(Plane(origin=(63.024985132, 153.354295574, 10), x_dir=(0, -1, 0), z_dir=(0, 0, -1))) as fillet3_piece_7_section:
        with BuildLine():
            CenterArc((FILLET3_R, -FILLET3_R), FILLET3_R, 90, 90)
            Line((0, -FILLET3_R), (0, 0))
            Line((0, 0), (FILLET3_R, 0))
        make_face()
    fillet3_piece_7 = extrude(amount=31.9, mode=Mode.PRIVATE)
    fillet3_piece_7 = split(fillet3_piece_7, bisect_by=Plane(origin=(70.287056522, 153.22855516, 0), z_dir=(0, 0, 1)), keep=Keep.TOP, mode=Mode.PRIVATE)
    fillet3_piece_7 = split(fillet3_piece_7, bisect_by=Plane(origin=(70.287056522, 153.22855516, 3.1), z_dir=(0, 0, -1)), keep=Keep.TOP, mode=Mode.PRIVATE)
    fillet3_piece_7 = split(fillet3_piece_7, bisect_by=Plane(origin=(68.824985132, 153.22855516, 1.55), z_dir=(1, 0, 0)), keep=Keep.TOP, mode=Mode.PRIVATE)
    add(fillet3_piece_7)
    with BuildSketch(Plane(origin=(63.024985132, 153.354295574, 10), x_dir=(0, -1, 0), z_dir=(0, 0, -1))) as fillet3_piece_8_section:
        with BuildLine():
            CenterArc((FILLET3_R, -FILLET3_R), FILLET3_R, 90, 90)
            Line((0, -FILLET3_R), (0, 0))
            Line((0, 0), (FILLET3_R, 0))
        make_face()
    fillet3_piece_8 = extrude(amount=31.9, mode=Mode.PRIVATE)
    fillet3_piece_8 = split(fillet3_piece_8, bisect_by=Plane(origin=(70.287056522, 153.22855516, 0), z_dir=(0, 0, -1)), keep=Keep.TOP, mode=Mode.PRIVATE)
    fillet3_piece_8 = split(fillet3_piece_8, bisect_by=Plane(origin=(70.287056522, 153.22855516, -1.9), z_dir=(0, 0, 1)), keep=Keep.TOP, mode=Mode.PRIVATE)
    fillet3_piece_8 = split(fillet3_piece_8, bisect_by=Plane(origin=(68.824985132, 153.22855516, -0.95), z_dir=(1, 0, 0)), keep=Keep.TOP, mode=Mode.PRIVATE)
    add(fillet3_piece_8)
    with BuildSketch(Plane(origin=(-6.875014868, 153.354295574, 10), x_dir=(0, -1, 0), z_dir=(0, 0, -1))) as fillet3_piece_9_section:
        with BuildLine():
            CenterArc((FILLET3_R, FILLET3_R), FILLET3_R, 180, 90)
            Line((0, FILLET3_R), (0, 0))
            Line((0, 0), (FILLET3_R, 0))
        make_face()
    fillet3_piece_9 = extrude(amount=6.9, mode=Mode.PRIVATE)
    fillet3_piece_9 = split(fillet3_piece_9, bisect_by=Plane(origin=(-12.675014868, 150.897486171, 6.55), z_dir=(1, 0, 0)), keep=Keep.TOP, mode=Mode.PRIVATE)
    add(fillet3_piece_9)
    with BuildSketch(Plane(origin=(-6.875014868, 153.354295574, 10), x_dir=(0, -1, 0), z_dir=(0, 0, -1))) as fillet3_piece_10_section:
        with BuildLine():
            CenterArc((FILLET3_R, FILLET3_R), FILLET3_R, 180, 90)
            Line((0, FILLET3_R), (0, 0))
            Line((0, 0), (FILLET3_R, 0))
        make_face()
    fillet3_piece_10 = extrude(amount=6.9, mode=Mode.PRIVATE)
    fillet3_piece_10 = split(fillet3_piece_10, bisect_by=Plane(origin=(-12.675014868, 153.22855516, 6.55), z_dir=(-1, 0, 0)), keep=Keep.TOP, mode=Mode.PRIVATE)
    add(fillet3_piece_10)
    with BuildSketch(Plane(origin=(-6.875014868, 153.354295574, 10), x_dir=(0, -1, 0), z_dir=(0, 0, -1))) as fillet3_piece_11_section:
        with BuildLine():
            CenterArc((FILLET3_R, FILLET3_R), FILLET3_R, 180, 90)
            Line((0, FILLET3_R), (0, 0))
            Line((0, 0), (FILLET3_R, 0))
        make_face()
    fillet3_piece_11 = extrude(amount=31.9, mode=Mode.PRIVATE)
    fillet3_piece_11 = split(fillet3_piece_11, bisect_by=Plane(origin=(-14.137086257, 153.22855516, 0), z_dir=(0, 0, 1)), keep=Keep.TOP, mode=Mode.PRIVATE)
    fillet3_piece_11 = split(fillet3_piece_11, bisect_by=Plane(origin=(-14.137086257, 153.22855516, 3.1), z_dir=(0, 0, -1)), keep=Keep.TOP, mode=Mode.PRIVATE)
    fillet3_piece_11 = split(fillet3_piece_11, bisect_by=Plane(origin=(-12.675014868, 153.22855516, 1.55), z_dir=(-1, 0, 0)), keep=Keep.TOP, mode=Mode.PRIVATE)
    add(fillet3_piece_11)
    with BuildSketch(Plane(origin=(-6.875014868, 153.354295574, 10), x_dir=(0, -1, 0), z_dir=(0, 0, -1))) as fillet3_piece_12_section:
        with BuildLine():
            CenterArc((FILLET3_R, FILLET3_R), FILLET3_R, 180, 90)
            Line((0, FILLET3_R), (0, 0))
            Line((0, 0), (FILLET3_R, 0))
        make_face()
    fillet3_piece_12 = extrude(amount=31.9, mode=Mode.PRIVATE)
    fillet3_piece_12 = split(fillet3_piece_12, bisect_by=Plane(origin=(-14.137086257, 153.22855516, 0), z_dir=(0, 0, -1)), keep=Keep.TOP, mode=Mode.PRIVATE)
    fillet3_piece_12 = split(fillet3_piece_12, bisect_by=Plane(origin=(-14.137086257, 153.22855516, -1.9), z_dir=(0, 0, 1)), keep=Keep.TOP, mode=Mode.PRIVATE)
    fillet3_piece_12 = split(fillet3_piece_12, bisect_by=Plane(origin=(-12.675014868, 153.22855516, -0.95), z_dir=(-1, 0, 0)), keep=Keep.TOP, mode=Mode.PRIVATE)
    add(fillet3_piece_12)
    with BuildSketch(Plane(origin=(-6.875014868, 105.023992794, -21.9), x_dir=(-1, 0, 0), z_dir=(0, 0, 1))) as fillet3_piece_13_section:
        with BuildLine():
            CenterArc((FILLET3_R, -FILLET3_R), FILLET3_R, 90, 90)
            Line((0, -FILLET3_R), (0, 0))
            Line((0, 0), (FILLET3_R, 0))
        make_face()
    fillet3_piece_13 = extrude(amount=31.9, mode=Mode.PRIVATE)
    fillet3_piece_13 = split(fillet3_piece_13, bisect_by=Plane(origin=(-12.675014868, 105.149733209, -0.95), z_dir=(-1, 0, 0)), keep=Keep.TOP, mode=Mode.PRIVATE)
    fillet3_piece_13 = split(fillet3_piece_13, bisect_by=Plane(origin=(-14.137086257, 105.149733209, -1.9), z_dir=(0, 0, 1)), keep=Keep.TOP, mode=Mode.PRIVATE)
    fillet3_piece_13 = split(fillet3_piece_13, bisect_by=Plane(origin=(-14.137086257, 105.149733209, 0), z_dir=(0, 0, -1)), keep=Keep.TOP, mode=Mode.PRIVATE)
    add(fillet3_piece_13)
    with BuildSketch(Plane(origin=(-6.875014868, 105.023992794, -21.9), x_dir=(-1, 0, 0), z_dir=(0, 0, 1))) as fillet3_piece_14_section:
        with BuildLine():
            CenterArc((FILLET3_R, -FILLET3_R), FILLET3_R, 90, 90)
            Line((0, -FILLET3_R), (0, 0))
            Line((0, 0), (FILLET3_R, 0))
        make_face()
    fillet3_piece_14 = extrude(amount=31.9, mode=Mode.PRIVATE)
    fillet3_piece_14 = split(fillet3_piece_14, bisect_by=Plane(origin=(-14.137086257, 105.149733209, 3.1), z_dir=(0, 0, -1)), keep=Keep.TOP, mode=Mode.PRIVATE)
    fillet3_piece_14 = split(fillet3_piece_14, bisect_by=Plane(origin=(-12.675014868, 105.149733209, 1.55), z_dir=(-1, 0, 0)), keep=Keep.TOP, mode=Mode.PRIVATE)
    fillet3_piece_14 = split(fillet3_piece_14, bisect_by=Plane(origin=(-14.137086257, 105.149733209, 0), z_dir=(0, 0, 1)), keep=Keep.TOP, mode=Mode.PRIVATE)
    add(fillet3_piece_14)
    with BuildSketch(Plane(origin=(-6.875014868, 105.023992794, 3.1), x_dir=(-1, 0, 0), z_dir=(0, 0, 1))) as fillet3_piece_15_section:
        with BuildLine():
            CenterArc((FILLET3_R, -FILLET3_R), FILLET3_R, 90, 90)
            Line((0, -FILLET3_R), (0, 0))
            Line((0, 0), (FILLET3_R, 0))
        make_face()
    fillet3_piece_15 = extrude(amount=6.9, mode=Mode.PRIVATE)
    fillet3_piece_15 = split(fillet3_piece_15, bisect_by=Plane(origin=(-12.675014868, 105.149733209, 6.55), z_dir=(-1, 0, 0)), keep=Keep.TOP, mode=Mode.PRIVATE)
    add(fillet3_piece_15)
    with BuildSketch(Plane(origin=(-6.875014868, 105.023992794, 3.1), x_dir=(-1, 0, 0), z_dir=(0, 0, 1))) as fillet3_piece_16_section:
        with BuildLine():
            CenterArc((FILLET3_R, -FILLET3_R), FILLET3_R, 90, 90)
            Line((0, -FILLET3_R), (0, 0))
            Line((0, 0), (FILLET3_R, 0))
        make_face()
    fillet3_piece_16 = extrude(amount=6.9, mode=Mode.PRIVATE)
    fillet3_piece_16 = split(fillet3_piece_16, bisect_by=Plane(origin=(-12.675014868, 107.480802197, 6.55), z_dir=(1, 0, 0)), keep=Keep.TOP, mode=Mode.PRIVATE)
    add(fillet3_piece_16)

    # Fillet4
    fillet4_edges = [cut_extrude1_piece_1_3.edges().sort_by_distance(p)[0] for p in [
        (73.024985132, 105.023992794, 4.05),
        (73.024985132, 153.354295574, 4.05),
        (-16.875014868, 153.354295574, 4.05),
        (-16.875014868, 105.023992794, 4.05),
    ]]
    fillet(fillet4_edges, radius=FILLET4_R)

    # Sketch25 → Boss-Extrude21 (add)
    with BuildSketch(Plane.XZ.offset(-126.689144184)):
        with Locations((28.074985132, 6.75)):
            Rectangle(SKETCH25_W, SKETCH25_H)
    extrude(amount=BOSS_EXTRUDE21_DEPTH)

    # Sketch26 → Boss-Extrude22 (add)
    with BuildSketch(Plane(origin=(0, 131.689144184, 0), x_dir=(-1, 0, 0), z_dir=(0, 1, 0))):
        with Locations((-28.074985132, 6.75)):
            Rectangle(SKETCH26_W, SKETCH26_H)
    extrude(amount=BOSS_EXTRUDE22_DEPTH)

    # Fillet5
    fillet5_edges = [cut_extrude1_piece_1_3.edges().sort_by_distance(p)[0] for p in [
        (58.824985132, 279.189144184, 6.55),
        (-2.675014868, 279.189144184, 6.55),
        (-2.675014868, 123.689144184, 6.75),
        (58.824985132, 123.689144184, 6.75),
        (58.824985132, 134.689144184, 6.75),
        (-2.675014868, 134.689144184, 6.75),
        (-2.675014868, -20.810855816, 6.55),
        (58.824985132, -20.810855816, 6.55),
    ]]
    fillet(fillet5_edges, radius=FILLET5_R)


with BuildPart() as body_2_2:
    # Split2: the piece on the far side of the plane
    add(cut_extrude1_piece_1_3.part)
    split(bisect_by=Plane(origin=(0, 129.189144184, 0), x_dir=(0, 0, -1), z_dir=(0, -1, 0)), keep=Keep.BOTTOM)


with BuildPart() as cut_extrude1_piece_1_4:
    add(cut_extrude1_piece_1_3.part)

    # Split2
    split(bisect_by=Plane(origin=(0, 129.189144184, 0), x_dir=(0, 0, -1), z_dir=(0, -1, 0)), keep=Keep.TOP)


solid = Compound([body_2_2.part, cut_extrude1_piece_1_4.part])
